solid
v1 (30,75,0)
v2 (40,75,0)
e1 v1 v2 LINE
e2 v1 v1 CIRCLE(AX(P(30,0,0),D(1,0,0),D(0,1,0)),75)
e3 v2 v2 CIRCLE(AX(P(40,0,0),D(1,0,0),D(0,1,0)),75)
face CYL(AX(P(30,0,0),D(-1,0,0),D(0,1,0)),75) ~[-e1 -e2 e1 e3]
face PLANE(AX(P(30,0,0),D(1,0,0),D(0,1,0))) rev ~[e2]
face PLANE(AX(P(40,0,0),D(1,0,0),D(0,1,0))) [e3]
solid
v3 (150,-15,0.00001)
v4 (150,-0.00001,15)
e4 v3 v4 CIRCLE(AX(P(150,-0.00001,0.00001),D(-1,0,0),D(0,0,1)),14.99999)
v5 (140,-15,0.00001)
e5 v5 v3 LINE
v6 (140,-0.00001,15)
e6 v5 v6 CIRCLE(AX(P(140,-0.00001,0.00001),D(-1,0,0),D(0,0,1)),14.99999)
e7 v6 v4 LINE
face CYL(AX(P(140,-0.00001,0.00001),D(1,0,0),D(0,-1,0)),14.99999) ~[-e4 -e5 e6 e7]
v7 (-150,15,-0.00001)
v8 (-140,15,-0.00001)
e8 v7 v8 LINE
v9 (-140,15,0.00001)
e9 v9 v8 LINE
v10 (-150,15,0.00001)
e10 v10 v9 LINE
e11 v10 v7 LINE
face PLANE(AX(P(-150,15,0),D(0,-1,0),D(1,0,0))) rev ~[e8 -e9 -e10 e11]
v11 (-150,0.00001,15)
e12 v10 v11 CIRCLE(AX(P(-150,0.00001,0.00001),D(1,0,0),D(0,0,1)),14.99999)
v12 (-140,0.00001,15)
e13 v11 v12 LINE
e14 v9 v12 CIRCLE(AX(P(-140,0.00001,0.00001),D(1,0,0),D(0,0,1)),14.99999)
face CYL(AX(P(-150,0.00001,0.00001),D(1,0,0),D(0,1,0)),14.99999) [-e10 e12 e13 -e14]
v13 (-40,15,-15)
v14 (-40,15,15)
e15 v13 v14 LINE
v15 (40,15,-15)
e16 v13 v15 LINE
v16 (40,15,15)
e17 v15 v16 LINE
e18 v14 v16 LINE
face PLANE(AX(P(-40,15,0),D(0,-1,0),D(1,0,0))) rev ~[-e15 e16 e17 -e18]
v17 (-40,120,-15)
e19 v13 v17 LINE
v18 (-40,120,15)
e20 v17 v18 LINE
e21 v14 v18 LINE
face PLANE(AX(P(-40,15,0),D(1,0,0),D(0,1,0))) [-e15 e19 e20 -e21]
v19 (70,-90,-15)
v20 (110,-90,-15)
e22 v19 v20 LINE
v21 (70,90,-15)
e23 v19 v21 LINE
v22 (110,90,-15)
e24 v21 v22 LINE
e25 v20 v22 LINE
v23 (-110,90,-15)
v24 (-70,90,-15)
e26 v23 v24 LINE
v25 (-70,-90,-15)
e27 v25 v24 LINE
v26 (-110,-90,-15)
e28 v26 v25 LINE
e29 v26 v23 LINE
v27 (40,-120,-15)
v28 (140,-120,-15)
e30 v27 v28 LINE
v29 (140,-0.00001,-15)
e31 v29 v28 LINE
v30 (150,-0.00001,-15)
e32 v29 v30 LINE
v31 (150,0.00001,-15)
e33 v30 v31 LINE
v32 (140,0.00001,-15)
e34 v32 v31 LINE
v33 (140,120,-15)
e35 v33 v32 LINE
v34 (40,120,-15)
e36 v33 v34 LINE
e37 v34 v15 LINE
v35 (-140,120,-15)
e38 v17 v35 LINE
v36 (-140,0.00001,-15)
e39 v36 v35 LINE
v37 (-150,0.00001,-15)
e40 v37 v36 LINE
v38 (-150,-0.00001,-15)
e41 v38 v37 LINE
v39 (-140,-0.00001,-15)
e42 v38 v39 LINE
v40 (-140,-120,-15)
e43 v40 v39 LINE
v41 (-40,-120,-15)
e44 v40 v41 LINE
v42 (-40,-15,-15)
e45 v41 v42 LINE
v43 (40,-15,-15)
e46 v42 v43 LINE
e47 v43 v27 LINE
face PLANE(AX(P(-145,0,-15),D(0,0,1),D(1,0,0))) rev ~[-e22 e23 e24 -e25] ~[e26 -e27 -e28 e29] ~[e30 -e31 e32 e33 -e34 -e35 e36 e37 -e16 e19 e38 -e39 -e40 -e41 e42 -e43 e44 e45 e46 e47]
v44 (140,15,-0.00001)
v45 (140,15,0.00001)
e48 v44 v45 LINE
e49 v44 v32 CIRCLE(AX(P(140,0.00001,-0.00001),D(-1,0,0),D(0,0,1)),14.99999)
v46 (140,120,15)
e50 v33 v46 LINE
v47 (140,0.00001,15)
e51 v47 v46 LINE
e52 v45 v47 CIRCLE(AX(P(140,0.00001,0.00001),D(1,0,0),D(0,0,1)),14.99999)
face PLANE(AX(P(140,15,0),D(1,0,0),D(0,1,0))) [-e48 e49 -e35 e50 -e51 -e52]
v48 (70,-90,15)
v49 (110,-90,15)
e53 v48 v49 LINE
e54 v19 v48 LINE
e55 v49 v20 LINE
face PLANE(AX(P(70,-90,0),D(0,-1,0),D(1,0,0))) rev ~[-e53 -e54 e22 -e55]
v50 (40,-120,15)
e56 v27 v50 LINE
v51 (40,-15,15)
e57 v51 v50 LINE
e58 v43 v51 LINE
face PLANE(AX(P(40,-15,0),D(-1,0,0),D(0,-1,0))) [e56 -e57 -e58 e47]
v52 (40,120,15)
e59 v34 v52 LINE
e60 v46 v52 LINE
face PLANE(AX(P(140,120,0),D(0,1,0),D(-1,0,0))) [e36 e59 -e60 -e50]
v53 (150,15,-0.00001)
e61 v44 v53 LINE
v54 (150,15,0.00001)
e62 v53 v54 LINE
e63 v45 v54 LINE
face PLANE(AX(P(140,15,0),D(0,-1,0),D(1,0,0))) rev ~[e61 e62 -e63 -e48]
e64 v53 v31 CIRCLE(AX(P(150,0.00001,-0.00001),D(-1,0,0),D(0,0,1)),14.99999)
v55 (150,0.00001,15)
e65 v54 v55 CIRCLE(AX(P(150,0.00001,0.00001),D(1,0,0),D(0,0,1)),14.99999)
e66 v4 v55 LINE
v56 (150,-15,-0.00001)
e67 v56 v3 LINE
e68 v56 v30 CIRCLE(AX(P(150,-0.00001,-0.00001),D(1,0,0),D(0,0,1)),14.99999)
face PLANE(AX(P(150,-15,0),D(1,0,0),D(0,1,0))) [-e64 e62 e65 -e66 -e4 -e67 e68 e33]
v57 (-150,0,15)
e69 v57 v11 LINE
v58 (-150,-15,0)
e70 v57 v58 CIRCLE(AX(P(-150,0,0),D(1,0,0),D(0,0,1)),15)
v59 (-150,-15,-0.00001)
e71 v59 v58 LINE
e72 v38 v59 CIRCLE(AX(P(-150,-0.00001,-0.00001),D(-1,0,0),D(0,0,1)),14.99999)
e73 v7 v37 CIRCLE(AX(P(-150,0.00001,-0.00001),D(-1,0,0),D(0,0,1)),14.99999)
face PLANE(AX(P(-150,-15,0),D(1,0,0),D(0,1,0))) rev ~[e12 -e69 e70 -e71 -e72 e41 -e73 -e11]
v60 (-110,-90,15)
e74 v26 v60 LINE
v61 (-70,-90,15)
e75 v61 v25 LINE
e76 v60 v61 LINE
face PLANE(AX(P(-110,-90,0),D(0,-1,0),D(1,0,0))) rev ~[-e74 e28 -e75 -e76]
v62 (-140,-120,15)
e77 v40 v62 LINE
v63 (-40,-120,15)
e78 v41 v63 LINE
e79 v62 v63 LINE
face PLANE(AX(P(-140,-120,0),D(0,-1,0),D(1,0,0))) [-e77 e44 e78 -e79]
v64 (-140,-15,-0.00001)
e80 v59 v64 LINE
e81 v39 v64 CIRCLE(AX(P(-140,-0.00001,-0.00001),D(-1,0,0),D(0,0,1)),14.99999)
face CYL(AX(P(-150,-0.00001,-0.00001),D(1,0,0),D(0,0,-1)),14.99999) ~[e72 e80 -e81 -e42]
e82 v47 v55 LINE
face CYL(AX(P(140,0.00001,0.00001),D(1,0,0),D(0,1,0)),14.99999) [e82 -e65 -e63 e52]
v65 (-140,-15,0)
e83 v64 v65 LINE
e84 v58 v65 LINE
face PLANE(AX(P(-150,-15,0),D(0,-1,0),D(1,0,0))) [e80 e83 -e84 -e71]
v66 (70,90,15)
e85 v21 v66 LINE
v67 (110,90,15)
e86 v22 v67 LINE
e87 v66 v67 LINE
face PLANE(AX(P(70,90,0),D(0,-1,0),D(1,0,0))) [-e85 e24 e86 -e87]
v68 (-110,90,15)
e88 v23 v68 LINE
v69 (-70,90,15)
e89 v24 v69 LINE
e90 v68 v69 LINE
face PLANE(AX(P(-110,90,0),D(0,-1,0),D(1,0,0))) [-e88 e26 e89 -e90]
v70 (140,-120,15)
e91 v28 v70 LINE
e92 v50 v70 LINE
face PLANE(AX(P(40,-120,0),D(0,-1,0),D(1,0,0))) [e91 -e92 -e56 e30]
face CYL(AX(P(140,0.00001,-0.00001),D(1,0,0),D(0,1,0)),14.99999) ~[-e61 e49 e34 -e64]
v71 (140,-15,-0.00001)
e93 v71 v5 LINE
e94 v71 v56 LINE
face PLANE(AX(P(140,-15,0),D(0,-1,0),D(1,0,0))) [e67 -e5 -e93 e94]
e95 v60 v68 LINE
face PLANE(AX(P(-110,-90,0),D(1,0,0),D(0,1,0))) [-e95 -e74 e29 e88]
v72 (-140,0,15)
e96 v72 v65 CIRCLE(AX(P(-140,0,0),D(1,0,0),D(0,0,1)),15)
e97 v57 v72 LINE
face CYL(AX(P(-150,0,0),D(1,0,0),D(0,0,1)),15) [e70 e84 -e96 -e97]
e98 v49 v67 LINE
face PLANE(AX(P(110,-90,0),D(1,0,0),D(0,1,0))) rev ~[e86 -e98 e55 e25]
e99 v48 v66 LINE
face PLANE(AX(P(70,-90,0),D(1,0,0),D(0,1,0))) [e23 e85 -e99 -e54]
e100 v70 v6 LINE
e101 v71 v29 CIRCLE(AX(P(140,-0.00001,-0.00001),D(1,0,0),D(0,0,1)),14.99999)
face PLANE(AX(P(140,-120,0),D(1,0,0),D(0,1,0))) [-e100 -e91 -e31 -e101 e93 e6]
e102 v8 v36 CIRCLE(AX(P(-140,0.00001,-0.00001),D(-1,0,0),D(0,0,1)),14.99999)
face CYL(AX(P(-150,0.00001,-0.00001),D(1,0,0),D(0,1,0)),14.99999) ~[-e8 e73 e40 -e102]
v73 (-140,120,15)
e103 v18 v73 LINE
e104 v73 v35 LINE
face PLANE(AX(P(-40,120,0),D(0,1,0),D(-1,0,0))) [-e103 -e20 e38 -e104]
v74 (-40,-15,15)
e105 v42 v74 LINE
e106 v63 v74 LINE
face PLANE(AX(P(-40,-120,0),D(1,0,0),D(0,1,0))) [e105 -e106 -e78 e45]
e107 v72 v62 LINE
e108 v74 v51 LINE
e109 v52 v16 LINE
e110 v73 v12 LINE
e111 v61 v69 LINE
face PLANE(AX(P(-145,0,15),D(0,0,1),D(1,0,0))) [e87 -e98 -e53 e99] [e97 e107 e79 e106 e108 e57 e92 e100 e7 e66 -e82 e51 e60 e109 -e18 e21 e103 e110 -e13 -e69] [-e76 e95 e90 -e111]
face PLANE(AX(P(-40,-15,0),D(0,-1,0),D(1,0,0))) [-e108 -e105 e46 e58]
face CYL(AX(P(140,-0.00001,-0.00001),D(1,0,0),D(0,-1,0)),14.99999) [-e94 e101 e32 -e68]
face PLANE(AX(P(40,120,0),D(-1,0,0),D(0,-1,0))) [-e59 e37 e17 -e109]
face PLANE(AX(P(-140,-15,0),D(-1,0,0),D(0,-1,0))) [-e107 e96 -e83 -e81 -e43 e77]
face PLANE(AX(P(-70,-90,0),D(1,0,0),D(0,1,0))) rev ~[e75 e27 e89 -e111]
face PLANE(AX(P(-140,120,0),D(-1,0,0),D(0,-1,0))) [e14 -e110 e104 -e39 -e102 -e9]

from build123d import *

# Parameters (mm, degrees)
F0_W     = 10
F0_H     = 30
F0_W_2   = 40
F0_H_2   = 180
F0_W_3   = 80
F1_DEPTH = 15
F2_R     = 15
F3_R     = 14.99999
F5_START = 30
F4_R     = 75
F5_DEPTH = 10


# Not quite as in the source:
# - a fillet or chamfer is up to 0.001 mm smaller than in the source, because OpenCascade refuses the exact size


with BuildPart() as f1:
    # F0 (on Top) → F1 (new body, symmetric)
    with BuildSketch(Plane.XY):
        with Locations((-145, 0)):
            Rectangle(F0_W, F0_H)
        Polygon((-140, 120), (-140, 15), (-140, -15), (-140, -120), (-40, -120), (-40, -15), (-40, 15), (-40, 120), align=None)
        with Locations((-90, 0)):
            Rectangle(F0_W_2, F0_H_2, mode=Mode.SUBTRACT)
        Rectangle(F0_W_3, F0_H)
        Polygon((40, 120), (40, 15), (40, -15), (40, -120), (140, -120), (140, -15), (140, 15), (140, 120), align=None)
        with Locations((90, 0)):
            Rectangle(F0_W_2, F0_H_2, mode=Mode.SUBTRACT)
        with Locations((145, 0)):
            Rectangle(F0_W, F0_H)
    extrude(amount=F1_DEPTH, both=True)

    # F2
    f2_edges = [f1.edges().sort_by_distance(p)[0] for p in [
        (-145, -15, 15),
    ]]
    fillet(f2_edges, radius=F2_R)

    # F3 (radius 15 in the source; OpenCascade refuses exactly that, so slightly less here)
    f3_edges = [f1.edges().sort_by_distance(p)[0] for p in [
        (-145, -15, -15),
        (-145, 15, -15),
        (-145, 15, 15),
        (145, 15, -15),
        (145, 15, 15),
        (145, -15, 15),
        (145, -15, -15),
    ]]
    fillet(f3_edges, radius=F3_R)


with BuildPart() as f5:
    # F4 (on Right) → F5 (new body)
    with BuildSketch(Plane.YZ.offset(F5_START)):
        Circle(F4_R)
    extrude(amount=F5_DEPTH)


solid = Compound([f1.part, f5.part])
